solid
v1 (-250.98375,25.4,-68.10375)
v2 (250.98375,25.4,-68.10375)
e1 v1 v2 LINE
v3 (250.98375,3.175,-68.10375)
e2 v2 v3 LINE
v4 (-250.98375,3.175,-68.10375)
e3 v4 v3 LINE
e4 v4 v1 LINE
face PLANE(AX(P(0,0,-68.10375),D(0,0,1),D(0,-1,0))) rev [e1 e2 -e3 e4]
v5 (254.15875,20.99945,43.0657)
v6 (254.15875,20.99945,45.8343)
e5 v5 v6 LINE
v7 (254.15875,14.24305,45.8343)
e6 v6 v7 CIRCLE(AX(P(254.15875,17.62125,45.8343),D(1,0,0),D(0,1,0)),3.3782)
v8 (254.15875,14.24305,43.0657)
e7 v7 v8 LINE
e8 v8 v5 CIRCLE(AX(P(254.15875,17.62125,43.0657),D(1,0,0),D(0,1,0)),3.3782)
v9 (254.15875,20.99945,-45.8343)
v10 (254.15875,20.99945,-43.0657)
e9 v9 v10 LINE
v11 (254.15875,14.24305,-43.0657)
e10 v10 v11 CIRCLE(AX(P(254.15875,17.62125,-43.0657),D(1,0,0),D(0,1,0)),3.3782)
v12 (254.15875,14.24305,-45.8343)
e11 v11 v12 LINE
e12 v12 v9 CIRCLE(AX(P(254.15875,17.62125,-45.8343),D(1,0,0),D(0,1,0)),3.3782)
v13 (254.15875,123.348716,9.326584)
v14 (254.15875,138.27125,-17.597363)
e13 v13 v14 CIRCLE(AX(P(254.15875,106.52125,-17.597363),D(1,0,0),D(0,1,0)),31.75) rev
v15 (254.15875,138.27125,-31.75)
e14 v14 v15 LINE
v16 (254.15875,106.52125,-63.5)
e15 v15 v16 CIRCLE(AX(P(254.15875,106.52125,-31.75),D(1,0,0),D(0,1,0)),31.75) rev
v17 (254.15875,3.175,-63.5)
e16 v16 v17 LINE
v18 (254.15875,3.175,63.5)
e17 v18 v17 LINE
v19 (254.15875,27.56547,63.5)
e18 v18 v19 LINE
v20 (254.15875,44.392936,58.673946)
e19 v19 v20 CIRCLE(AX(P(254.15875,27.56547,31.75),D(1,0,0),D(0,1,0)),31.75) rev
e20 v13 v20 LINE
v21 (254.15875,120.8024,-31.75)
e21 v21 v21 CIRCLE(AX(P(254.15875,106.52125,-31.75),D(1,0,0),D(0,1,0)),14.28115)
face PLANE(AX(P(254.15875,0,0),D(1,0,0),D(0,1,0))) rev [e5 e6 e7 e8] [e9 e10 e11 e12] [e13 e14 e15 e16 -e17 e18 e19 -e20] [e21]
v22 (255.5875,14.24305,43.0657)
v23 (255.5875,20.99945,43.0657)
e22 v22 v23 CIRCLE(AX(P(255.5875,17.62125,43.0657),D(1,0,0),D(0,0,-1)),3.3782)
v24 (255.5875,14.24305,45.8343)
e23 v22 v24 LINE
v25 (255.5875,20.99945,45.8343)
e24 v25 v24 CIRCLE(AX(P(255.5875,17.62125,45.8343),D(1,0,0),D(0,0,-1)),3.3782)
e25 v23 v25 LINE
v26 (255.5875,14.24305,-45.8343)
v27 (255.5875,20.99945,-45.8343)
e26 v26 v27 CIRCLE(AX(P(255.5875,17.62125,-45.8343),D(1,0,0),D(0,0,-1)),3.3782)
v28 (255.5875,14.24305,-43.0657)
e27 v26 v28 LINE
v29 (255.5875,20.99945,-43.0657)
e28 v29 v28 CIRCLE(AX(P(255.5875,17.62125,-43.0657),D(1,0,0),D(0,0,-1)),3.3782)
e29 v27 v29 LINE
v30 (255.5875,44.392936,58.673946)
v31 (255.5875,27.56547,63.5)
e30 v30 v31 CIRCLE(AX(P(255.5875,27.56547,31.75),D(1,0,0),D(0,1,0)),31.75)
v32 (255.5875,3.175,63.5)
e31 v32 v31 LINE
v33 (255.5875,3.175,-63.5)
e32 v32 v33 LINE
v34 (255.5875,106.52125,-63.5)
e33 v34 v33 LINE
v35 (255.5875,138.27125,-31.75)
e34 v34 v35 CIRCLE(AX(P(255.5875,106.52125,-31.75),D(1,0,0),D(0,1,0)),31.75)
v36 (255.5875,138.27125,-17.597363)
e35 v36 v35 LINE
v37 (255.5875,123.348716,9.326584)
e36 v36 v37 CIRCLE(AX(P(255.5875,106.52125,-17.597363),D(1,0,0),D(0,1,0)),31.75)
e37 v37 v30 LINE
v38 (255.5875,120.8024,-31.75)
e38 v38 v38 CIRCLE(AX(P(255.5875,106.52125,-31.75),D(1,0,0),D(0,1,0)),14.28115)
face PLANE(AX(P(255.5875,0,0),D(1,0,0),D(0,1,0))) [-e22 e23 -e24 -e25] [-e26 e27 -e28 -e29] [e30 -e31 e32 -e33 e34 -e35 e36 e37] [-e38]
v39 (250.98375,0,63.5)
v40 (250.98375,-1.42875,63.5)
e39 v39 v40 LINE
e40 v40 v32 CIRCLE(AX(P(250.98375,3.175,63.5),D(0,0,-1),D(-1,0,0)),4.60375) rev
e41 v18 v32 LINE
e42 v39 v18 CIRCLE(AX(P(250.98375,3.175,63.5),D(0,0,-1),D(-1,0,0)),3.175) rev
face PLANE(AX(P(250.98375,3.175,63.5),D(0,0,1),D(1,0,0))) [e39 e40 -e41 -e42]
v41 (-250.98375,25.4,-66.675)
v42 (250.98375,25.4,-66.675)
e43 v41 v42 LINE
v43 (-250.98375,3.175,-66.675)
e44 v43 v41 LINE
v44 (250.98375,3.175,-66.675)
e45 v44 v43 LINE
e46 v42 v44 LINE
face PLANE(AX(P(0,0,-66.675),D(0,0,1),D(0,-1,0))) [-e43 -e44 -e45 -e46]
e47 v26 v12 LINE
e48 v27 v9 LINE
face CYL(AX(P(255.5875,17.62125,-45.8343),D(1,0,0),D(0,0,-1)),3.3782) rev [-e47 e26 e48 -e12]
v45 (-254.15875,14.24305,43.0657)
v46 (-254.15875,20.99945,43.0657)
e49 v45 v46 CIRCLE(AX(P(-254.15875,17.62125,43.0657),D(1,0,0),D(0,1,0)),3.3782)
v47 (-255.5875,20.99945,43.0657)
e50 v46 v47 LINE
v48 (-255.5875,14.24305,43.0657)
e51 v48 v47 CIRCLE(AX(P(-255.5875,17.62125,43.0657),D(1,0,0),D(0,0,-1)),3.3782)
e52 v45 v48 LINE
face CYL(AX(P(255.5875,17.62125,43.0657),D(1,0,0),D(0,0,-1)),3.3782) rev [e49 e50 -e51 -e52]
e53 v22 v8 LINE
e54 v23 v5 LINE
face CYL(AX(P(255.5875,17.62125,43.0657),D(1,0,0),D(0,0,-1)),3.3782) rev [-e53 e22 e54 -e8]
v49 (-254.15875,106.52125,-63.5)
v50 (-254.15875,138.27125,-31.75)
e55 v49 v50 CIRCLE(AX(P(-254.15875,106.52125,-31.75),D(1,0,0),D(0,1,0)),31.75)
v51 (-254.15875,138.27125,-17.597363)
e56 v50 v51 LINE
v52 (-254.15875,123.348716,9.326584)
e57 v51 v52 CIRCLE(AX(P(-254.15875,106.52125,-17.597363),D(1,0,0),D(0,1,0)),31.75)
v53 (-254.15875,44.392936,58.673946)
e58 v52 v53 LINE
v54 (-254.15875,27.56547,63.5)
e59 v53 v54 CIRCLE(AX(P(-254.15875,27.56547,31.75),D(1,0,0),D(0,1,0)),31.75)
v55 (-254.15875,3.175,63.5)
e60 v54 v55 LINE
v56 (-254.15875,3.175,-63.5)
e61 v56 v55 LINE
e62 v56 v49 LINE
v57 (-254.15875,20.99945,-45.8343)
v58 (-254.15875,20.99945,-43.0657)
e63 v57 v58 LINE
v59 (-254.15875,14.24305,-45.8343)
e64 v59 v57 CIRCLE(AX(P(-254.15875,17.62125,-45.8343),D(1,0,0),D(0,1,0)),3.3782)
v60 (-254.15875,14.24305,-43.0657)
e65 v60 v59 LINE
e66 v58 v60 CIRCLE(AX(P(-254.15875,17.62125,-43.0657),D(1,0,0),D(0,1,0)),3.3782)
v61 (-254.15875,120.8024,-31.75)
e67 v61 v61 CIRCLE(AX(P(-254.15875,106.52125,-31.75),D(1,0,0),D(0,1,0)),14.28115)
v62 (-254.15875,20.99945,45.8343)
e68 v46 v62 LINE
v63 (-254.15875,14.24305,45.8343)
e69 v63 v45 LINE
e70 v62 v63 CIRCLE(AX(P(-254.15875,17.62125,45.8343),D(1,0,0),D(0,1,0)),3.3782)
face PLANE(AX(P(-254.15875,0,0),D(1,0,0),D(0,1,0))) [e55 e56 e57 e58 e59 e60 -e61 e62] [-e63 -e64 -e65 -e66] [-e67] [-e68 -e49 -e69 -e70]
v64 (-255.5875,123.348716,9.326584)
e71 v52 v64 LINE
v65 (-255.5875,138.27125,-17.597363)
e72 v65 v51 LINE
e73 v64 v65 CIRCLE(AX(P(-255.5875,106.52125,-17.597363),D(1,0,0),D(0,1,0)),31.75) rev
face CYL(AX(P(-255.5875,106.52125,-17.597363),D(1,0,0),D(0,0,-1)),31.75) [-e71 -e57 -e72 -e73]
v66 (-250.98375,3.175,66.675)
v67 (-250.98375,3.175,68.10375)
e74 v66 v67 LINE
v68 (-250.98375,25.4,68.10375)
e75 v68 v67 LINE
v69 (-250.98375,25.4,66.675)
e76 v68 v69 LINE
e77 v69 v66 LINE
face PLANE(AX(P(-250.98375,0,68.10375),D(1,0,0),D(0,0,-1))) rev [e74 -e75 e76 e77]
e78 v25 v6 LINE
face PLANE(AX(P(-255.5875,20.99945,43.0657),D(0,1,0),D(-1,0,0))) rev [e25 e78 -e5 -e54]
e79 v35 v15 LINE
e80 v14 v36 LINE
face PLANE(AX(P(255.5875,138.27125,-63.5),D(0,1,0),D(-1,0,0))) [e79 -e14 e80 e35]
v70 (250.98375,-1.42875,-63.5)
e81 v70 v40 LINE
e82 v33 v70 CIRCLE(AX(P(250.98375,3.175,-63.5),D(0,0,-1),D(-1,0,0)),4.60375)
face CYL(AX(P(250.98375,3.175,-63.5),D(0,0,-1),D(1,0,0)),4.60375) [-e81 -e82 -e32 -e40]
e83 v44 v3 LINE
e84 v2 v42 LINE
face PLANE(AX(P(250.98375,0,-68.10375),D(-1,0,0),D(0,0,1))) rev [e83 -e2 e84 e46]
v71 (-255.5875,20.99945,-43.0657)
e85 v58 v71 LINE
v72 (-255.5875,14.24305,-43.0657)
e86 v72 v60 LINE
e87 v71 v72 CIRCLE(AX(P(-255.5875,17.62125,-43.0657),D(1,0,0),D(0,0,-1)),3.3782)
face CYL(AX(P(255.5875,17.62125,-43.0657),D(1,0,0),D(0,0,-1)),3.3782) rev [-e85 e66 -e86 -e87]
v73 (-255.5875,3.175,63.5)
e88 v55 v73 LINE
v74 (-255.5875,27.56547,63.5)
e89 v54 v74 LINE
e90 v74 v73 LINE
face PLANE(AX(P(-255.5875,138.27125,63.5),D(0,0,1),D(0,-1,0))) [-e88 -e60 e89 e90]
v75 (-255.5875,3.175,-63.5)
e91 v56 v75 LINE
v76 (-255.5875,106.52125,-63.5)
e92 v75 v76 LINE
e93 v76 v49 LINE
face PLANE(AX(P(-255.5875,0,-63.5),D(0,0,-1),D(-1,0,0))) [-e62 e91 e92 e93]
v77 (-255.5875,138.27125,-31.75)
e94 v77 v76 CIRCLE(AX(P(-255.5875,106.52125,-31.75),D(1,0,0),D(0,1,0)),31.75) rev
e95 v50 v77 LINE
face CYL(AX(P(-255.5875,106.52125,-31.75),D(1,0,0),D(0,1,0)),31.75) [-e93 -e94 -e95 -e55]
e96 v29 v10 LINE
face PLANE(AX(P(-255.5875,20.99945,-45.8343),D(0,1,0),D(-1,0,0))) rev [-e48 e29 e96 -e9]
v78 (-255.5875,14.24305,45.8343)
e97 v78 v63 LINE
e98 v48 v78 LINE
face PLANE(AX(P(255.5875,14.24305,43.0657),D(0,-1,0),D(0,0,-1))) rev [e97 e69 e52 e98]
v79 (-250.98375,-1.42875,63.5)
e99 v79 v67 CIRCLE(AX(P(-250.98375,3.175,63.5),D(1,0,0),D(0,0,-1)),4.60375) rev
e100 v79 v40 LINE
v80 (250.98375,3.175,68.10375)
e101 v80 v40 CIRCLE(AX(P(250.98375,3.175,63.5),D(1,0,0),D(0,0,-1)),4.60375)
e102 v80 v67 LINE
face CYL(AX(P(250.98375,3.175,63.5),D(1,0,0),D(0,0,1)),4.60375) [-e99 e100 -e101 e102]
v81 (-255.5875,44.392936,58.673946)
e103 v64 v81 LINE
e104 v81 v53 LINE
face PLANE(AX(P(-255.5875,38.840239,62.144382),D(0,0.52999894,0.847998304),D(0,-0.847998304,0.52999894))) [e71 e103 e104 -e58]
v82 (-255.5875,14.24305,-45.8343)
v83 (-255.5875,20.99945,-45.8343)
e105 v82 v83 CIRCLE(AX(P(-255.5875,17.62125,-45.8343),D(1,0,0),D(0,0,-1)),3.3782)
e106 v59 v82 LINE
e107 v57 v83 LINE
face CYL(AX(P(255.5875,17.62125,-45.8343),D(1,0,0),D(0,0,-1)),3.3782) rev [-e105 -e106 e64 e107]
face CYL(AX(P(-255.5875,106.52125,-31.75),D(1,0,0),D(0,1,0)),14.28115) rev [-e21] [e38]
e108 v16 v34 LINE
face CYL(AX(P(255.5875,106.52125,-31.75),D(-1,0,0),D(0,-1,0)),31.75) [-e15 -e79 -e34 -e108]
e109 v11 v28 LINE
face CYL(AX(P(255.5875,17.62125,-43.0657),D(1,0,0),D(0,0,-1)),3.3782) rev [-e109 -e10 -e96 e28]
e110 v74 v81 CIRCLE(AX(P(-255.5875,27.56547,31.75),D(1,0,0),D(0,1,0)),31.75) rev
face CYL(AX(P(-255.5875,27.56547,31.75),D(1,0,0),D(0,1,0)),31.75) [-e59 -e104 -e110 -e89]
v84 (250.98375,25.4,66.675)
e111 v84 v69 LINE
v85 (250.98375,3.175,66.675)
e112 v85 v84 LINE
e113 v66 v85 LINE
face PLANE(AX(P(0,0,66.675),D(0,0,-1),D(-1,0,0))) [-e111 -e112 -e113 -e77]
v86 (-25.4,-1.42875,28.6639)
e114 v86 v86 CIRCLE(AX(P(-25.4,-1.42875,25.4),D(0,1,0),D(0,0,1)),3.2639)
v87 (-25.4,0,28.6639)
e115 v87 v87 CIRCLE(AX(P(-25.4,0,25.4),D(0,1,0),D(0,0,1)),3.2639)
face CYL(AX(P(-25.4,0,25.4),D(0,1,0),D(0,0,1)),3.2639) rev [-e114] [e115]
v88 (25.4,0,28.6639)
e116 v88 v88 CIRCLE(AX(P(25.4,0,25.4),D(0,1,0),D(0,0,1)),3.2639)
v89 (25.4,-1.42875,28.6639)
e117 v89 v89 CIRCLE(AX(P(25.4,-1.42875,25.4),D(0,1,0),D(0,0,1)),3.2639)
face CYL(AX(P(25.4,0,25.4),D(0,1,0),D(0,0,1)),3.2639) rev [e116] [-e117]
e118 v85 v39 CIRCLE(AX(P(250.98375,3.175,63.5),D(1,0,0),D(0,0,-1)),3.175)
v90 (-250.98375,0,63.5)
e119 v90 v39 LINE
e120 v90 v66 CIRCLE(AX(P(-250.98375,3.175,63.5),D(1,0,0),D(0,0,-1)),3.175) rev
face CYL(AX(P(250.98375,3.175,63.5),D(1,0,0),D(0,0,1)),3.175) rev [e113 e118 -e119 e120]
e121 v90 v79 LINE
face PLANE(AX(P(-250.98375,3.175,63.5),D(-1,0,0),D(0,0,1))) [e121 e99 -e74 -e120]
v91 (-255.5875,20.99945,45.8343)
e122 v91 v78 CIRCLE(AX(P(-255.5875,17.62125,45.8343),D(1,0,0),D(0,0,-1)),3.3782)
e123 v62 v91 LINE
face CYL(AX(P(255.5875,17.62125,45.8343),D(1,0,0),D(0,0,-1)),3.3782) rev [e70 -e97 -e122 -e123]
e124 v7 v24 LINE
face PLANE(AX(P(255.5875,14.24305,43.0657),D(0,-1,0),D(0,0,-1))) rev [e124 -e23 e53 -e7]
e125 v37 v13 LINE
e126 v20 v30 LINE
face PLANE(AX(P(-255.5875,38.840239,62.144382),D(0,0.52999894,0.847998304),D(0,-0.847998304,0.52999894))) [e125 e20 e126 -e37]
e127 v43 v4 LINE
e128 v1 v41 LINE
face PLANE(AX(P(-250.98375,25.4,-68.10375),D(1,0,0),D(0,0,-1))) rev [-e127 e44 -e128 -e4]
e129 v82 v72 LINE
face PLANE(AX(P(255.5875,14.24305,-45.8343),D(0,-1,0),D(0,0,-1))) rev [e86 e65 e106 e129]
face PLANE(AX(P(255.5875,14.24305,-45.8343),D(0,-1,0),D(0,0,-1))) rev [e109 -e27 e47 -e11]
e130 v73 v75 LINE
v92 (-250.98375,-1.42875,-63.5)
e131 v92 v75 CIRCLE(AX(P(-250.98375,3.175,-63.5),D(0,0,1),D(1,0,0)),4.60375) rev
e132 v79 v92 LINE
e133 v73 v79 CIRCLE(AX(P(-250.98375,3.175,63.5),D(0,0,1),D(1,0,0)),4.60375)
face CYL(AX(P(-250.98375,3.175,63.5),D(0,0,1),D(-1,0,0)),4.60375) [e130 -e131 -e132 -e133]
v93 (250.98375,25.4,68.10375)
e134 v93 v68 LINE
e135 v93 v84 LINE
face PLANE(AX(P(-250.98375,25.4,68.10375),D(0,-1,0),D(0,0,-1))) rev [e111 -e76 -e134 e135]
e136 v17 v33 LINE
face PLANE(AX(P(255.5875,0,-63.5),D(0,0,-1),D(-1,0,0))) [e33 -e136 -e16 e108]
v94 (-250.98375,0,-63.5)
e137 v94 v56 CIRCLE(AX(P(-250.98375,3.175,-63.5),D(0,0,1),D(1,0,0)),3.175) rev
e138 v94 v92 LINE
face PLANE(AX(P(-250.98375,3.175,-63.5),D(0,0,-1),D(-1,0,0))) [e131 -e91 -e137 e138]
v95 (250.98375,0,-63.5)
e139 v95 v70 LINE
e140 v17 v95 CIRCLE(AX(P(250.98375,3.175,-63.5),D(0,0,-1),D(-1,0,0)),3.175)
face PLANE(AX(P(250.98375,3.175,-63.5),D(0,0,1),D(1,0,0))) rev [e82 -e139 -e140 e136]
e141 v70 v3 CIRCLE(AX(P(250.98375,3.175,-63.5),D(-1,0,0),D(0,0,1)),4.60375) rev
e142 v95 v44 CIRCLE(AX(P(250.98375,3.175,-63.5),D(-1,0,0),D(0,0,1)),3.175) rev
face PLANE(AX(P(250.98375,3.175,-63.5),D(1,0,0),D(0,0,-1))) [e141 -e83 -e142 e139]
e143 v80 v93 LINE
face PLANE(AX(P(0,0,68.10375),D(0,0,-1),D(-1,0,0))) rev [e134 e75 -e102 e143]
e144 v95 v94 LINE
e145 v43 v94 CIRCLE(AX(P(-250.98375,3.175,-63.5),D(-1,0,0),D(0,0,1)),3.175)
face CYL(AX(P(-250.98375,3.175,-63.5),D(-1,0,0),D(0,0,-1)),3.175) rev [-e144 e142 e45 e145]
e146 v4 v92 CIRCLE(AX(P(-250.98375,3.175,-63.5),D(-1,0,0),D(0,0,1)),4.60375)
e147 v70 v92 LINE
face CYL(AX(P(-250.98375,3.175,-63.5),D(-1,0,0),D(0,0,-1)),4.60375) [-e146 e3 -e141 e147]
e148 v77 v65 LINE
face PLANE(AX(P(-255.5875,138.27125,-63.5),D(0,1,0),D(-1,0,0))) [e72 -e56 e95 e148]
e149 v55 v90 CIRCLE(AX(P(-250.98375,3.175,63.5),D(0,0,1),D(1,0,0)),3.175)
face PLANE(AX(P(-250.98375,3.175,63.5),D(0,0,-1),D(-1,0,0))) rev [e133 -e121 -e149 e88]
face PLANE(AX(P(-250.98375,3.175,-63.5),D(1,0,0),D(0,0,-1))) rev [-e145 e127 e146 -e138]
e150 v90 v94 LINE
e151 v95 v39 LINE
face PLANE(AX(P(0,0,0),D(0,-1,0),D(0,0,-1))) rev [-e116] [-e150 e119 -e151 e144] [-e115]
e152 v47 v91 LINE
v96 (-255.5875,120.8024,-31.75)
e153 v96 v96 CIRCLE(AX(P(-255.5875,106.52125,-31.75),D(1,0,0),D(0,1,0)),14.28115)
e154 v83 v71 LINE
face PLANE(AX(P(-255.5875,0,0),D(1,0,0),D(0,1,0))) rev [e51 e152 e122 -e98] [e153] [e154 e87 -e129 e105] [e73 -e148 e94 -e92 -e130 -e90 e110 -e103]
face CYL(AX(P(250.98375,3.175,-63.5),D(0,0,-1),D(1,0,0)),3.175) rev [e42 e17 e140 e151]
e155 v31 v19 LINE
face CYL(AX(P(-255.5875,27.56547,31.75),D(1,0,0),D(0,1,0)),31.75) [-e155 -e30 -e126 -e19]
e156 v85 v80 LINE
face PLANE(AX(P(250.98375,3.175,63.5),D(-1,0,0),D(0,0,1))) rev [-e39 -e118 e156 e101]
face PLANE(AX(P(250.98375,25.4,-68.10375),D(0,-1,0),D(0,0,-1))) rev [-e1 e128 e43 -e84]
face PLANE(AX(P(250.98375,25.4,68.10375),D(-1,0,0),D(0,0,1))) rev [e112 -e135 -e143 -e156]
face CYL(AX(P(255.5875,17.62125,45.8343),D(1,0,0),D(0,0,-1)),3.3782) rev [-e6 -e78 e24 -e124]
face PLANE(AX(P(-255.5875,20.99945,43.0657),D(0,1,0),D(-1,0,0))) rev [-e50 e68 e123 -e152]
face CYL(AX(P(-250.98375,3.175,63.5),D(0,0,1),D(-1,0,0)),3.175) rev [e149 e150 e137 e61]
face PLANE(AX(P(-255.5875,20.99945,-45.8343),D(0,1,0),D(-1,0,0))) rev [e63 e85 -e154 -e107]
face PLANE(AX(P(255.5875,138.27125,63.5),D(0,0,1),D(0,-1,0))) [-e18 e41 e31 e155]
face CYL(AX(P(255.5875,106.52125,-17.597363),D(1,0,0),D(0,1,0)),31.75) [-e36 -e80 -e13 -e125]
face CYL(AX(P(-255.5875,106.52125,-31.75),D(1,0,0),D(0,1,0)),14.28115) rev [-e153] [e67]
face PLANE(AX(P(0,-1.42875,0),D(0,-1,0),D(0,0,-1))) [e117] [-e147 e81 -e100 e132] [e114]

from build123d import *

# Parameters (mm, degrees)
SKETCH1_W                      = 511.175
SKETCH1_H                      = 127
BASE_FLANGE1_DEPTH             = 1.42875
EDGE_FLANGE1_STRIP_W           = 12.065
EDGE_FLANGE1_STRIP_H           = 1.42875
EDGE_FLANGE1_STRIP_CUT_DEPTH   = 127
EDGE_FLANGE1_STRIP_2_W         = 12.065
EDGE_FLANGE1_STRIP_2_H         = 1.42875
EDGE_FLANGE1_STRIP_CUT_2_DEPTH = 127
EDGE_FLANGE1_DEPTH             = 127
EDGE_FLANGE1_BEND_DEPTH        = 127
CUT_EXTRUDE1_DEPTH             = 534.339544007
FILLET1_R                      = 31.75
SKETCH14_R                     = 14.28115
CUT_EXTRUDE2_DEPTH             = 534.339544007
H_START                        = -255.5875
H_0_266_DIAMETER_SLOT1_DEPTH   = 511.175
F_0_257_DIAMETER_HOLE2_D       = 6.5278
EDGE_FLANGE2_DEPTH             = 501.9675
EDGE_FLANGE2_BEND_DEPTH        = 501.9675


# Read off the part's stored shape, not the designer's step: H (0.266) Diameter Slot1
# Sheet-metal steps are written as plain solids
with BuildPart() as part:
    # Sketch1 → Base-Flange1 (new body)
    with BuildSketch(Plane(origin=(0, 0, 0), x_dir=(1, 0, 0), z_dir=(0, 1, 0))):
        Rectangle(SKETCH1_W, SKETCH1_H)
    extrude(amount=-BASE_FLANGE1_DEPTH)

    # Edge-Flange1 strip (across the edge) → Edge-Flange1 strip cut (cut)
    with BuildSketch(Plane(origin=(255.5875, 0, 63.5), x_dir=(-1, 0, 0), z_dir=(0, 0, -1))):
        with Locations((-1.42875, -0.714375)):
            Rectangle(EDGE_FLANGE1_STRIP_W, EDGE_FLANGE1_STRIP_H)
    extrude(amount=EDGE_FLANGE1_STRIP_CUT_DEPTH, mode=Mode.SUBTRACT)

    # Edge-Flange1 strip 2 (across the edge) → Edge-Flange1 strip cut 2 (cut)
    with BuildSketch(Plane(origin=(-255.5875, 0, -63.5), x_dir=(1, 0, 0), z_dir=(0, 0, 1))):
        with Locations((-1.42875, -0.714375)):
            Rectangle(EDGE_FLANGE1_STRIP_2_W, EDGE_FLANGE1_STRIP_2_H)
    extrude(amount=EDGE_FLANGE1_STRIP_CUT_2_DEPTH, mode=Mode.SUBTRACT)

    # Edge-Flange1 section (across the edge) → Edge-Flange1 (add)
    with BuildSketch(Plane(origin=(255.5875, 0, 63.5), x_dir=(-1, 0, 0), z_dir=(0, 0, -1))):
        with BuildLine():
            Line((0, 3.175), (0, 138.27125))
            Line((0, 138.27125), (1.42875, 138.27125))
            Line((1.42875, 138.27125), (1.42875, 3.175))
            ThreePointArc((1.42875, 3.175), (2.35868597, 0.92993597), (4.60375, 0))
            Line((4.60375, 0), (4.60375, -1.42875))
            ThreePointArc((4.60375, -1.42875), (1.348407156, -0.080342844), (0, 3.175))
        make_face()
    extrude(amount=EDGE_FLANGE1_DEPTH)

    # Edge-Flange1 section 2 (across the edge) → Edge-Flange1 bend (add)
    with BuildSketch(Plane(origin=(-255.5875, 0, -63.5), x_dir=(1, 0, 0), z_dir=(0, 0, 1))):
        with BuildLine():
            Line((0, 3.175), (0, 138.27125))
            Line((0, 138.27125), (1.42875, 138.27125))
            Line((1.42875, 138.27125), (1.42875, 3.175))
            ThreePointArc((1.42875, 3.175), (2.35868597, 0.92993597), (4.60375, 0))
            Line((4.60375, 0), (4.60375, -1.42875))
            ThreePointArc((4.60375, -1.42875), (1.348407156, -0.080342844), (0, 3.175))
        make_face()
    extrude(amount=EDGE_FLANGE1_BEND_DEPTH)

    # Sketch13 → Cut-Extrude1 (cut, through all)
    with BuildSketch(Plane(origin=(255.5875, 0, 0), x_dir=(0, 0, -1), z_dir=(1, 0, 0))):
        Polygon((-63.5, 36.67125), (0, 138.27125), (-63.5, 138.27125), align=None)
    extrude(amount=-CUT_EXTRUDE1_DEPTH, mode=Mode.SUBTRACT)

    # Fillet1
    fillet1_edges = [part.edges().sort_by_distance(p)[0] for p in [
        (254.873125, 138.27125, -63.5),
        (-254.873125, 138.27125, -63.5),
        (254.873125, 138.27125, 0),
        (254.873125, 36.67125, 63.5),
        (-254.873125, 138.27125, 0),
        (-254.873125, 36.67125, 63.5),
    ]]
    fillet(fillet1_edges, radius=FILLET1_R)

    # Sketch14 → Cut-Extrude2 (cut, through all)
    with BuildSketch(Plane(origin=(255.5875, 0, 0), x_dir=(0, 0, -1), z_dir=(1, 0, 0))):
        with Locations(Location((31.75, 106.52125, 0), (0, 0, 90))):
            Circle(SKETCH14_R)
    extrude(amount=-CUT_EXTRUDE2_DEPTH, mode=Mode.SUBTRACT)

    # H (0.266) Diameter Slot1 outline → H (0.266) Diameter Slot1 (cut)
    with BuildSketch(Plane.YZ.offset(H_START)):
        with BuildLine():
            ThreePointArc((20.99945, -43.0657), (17.62125, -39.6875), (14.24305, -43.0657))
            Line((14.24305, -43.0657), (14.24305, -45.8343))
            ThreePointArc((14.24305, -45.8343), (17.62125, -49.2125), (20.99945, -45.8343))
            Line((20.99945, -45.8343), (20.99945, -43.0657))
        make_face()
        with BuildLine():
            ThreePointArc((20.99945, 45.8343), (17.62125, 49.2125), (14.24305, 45.8343))
            Line((14.24305, 45.8343), (14.24305, 43.0657))
            ThreePointArc((14.24305, 43.0657), (17.62125, 39.6875), (20.99945, 43.0657))
            Line((20.99945, 43.0657), (20.99945, 45.8343))
        make_face()
    extrude(amount=H_0_266_DIAMETER_SLOT1_DEPTH, mode=Mode.SUBTRACT)

    # F (0.257) Diameter Hole2 (through all)
    with Locations(Plane(origin=(0, 0, 0), x_dir=(1, 0, 0), z_dir=(0, 1, 0))):
        with Locations((-25.4, -25.4), (25.4, -25.4)):
            Hole(F_0_257_DIAMETER_HOLE2_D / 2)

    # Edge-Flange2 section (across the edge) → Edge-Flange2 (add)
    with BuildSketch(Plane(origin=(-250.98375, 0, 66.675), x_dir=(0, 0, -1), z_dir=(1, 0, 0))):
        with BuildLine():
            Line((-1.42875, 3.175), (-1.42875, 25.4))
            Line((-1.42875, 25.4), (0, 25.4))
            Line((0, 25.4), (0, 3.175))
            ThreePointArc((0, 3.175), (0.92993597, 0.92993597), (3.175, 0))
            Line((3.175, 0), (3.175, -1.42875))
            ThreePointArc((3.175, -1.42875), (-0.080342844, -0.080342844), (-1.42875, 3.175))
        make_face()
    extrude(amount=EDGE_FLANGE2_DEPTH)

    # Edge-Flange2 section 2 (across the edge) → Edge-Flange2 bend (add)
    with BuildSketch(Plane(origin=(250.98375, 0, -66.675), x_dir=(0, 0, 1), z_dir=(-1, 0, 0))):
        with BuildLine():
            Line((-1.42875, 3.175), (-1.42875, 25.4))
            Line((-1.42875, 25.4), (0, 25.4))
            Line((0, 25.4), (0, 3.175))
            ThreePointArc((0, 3.175), (0.92993597, 0.92993597), (3.175, 0))
            Line((3.175, 0), (3.175, -1.42875))
            ThreePointArc((3.175, -1.42875), (-0.080342844, -0.080342844), (-1.42875, 3.175))
        make_face()
    extrude(amount=EDGE_FLANGE2_BEND_DEPTH)


solid = part.part
